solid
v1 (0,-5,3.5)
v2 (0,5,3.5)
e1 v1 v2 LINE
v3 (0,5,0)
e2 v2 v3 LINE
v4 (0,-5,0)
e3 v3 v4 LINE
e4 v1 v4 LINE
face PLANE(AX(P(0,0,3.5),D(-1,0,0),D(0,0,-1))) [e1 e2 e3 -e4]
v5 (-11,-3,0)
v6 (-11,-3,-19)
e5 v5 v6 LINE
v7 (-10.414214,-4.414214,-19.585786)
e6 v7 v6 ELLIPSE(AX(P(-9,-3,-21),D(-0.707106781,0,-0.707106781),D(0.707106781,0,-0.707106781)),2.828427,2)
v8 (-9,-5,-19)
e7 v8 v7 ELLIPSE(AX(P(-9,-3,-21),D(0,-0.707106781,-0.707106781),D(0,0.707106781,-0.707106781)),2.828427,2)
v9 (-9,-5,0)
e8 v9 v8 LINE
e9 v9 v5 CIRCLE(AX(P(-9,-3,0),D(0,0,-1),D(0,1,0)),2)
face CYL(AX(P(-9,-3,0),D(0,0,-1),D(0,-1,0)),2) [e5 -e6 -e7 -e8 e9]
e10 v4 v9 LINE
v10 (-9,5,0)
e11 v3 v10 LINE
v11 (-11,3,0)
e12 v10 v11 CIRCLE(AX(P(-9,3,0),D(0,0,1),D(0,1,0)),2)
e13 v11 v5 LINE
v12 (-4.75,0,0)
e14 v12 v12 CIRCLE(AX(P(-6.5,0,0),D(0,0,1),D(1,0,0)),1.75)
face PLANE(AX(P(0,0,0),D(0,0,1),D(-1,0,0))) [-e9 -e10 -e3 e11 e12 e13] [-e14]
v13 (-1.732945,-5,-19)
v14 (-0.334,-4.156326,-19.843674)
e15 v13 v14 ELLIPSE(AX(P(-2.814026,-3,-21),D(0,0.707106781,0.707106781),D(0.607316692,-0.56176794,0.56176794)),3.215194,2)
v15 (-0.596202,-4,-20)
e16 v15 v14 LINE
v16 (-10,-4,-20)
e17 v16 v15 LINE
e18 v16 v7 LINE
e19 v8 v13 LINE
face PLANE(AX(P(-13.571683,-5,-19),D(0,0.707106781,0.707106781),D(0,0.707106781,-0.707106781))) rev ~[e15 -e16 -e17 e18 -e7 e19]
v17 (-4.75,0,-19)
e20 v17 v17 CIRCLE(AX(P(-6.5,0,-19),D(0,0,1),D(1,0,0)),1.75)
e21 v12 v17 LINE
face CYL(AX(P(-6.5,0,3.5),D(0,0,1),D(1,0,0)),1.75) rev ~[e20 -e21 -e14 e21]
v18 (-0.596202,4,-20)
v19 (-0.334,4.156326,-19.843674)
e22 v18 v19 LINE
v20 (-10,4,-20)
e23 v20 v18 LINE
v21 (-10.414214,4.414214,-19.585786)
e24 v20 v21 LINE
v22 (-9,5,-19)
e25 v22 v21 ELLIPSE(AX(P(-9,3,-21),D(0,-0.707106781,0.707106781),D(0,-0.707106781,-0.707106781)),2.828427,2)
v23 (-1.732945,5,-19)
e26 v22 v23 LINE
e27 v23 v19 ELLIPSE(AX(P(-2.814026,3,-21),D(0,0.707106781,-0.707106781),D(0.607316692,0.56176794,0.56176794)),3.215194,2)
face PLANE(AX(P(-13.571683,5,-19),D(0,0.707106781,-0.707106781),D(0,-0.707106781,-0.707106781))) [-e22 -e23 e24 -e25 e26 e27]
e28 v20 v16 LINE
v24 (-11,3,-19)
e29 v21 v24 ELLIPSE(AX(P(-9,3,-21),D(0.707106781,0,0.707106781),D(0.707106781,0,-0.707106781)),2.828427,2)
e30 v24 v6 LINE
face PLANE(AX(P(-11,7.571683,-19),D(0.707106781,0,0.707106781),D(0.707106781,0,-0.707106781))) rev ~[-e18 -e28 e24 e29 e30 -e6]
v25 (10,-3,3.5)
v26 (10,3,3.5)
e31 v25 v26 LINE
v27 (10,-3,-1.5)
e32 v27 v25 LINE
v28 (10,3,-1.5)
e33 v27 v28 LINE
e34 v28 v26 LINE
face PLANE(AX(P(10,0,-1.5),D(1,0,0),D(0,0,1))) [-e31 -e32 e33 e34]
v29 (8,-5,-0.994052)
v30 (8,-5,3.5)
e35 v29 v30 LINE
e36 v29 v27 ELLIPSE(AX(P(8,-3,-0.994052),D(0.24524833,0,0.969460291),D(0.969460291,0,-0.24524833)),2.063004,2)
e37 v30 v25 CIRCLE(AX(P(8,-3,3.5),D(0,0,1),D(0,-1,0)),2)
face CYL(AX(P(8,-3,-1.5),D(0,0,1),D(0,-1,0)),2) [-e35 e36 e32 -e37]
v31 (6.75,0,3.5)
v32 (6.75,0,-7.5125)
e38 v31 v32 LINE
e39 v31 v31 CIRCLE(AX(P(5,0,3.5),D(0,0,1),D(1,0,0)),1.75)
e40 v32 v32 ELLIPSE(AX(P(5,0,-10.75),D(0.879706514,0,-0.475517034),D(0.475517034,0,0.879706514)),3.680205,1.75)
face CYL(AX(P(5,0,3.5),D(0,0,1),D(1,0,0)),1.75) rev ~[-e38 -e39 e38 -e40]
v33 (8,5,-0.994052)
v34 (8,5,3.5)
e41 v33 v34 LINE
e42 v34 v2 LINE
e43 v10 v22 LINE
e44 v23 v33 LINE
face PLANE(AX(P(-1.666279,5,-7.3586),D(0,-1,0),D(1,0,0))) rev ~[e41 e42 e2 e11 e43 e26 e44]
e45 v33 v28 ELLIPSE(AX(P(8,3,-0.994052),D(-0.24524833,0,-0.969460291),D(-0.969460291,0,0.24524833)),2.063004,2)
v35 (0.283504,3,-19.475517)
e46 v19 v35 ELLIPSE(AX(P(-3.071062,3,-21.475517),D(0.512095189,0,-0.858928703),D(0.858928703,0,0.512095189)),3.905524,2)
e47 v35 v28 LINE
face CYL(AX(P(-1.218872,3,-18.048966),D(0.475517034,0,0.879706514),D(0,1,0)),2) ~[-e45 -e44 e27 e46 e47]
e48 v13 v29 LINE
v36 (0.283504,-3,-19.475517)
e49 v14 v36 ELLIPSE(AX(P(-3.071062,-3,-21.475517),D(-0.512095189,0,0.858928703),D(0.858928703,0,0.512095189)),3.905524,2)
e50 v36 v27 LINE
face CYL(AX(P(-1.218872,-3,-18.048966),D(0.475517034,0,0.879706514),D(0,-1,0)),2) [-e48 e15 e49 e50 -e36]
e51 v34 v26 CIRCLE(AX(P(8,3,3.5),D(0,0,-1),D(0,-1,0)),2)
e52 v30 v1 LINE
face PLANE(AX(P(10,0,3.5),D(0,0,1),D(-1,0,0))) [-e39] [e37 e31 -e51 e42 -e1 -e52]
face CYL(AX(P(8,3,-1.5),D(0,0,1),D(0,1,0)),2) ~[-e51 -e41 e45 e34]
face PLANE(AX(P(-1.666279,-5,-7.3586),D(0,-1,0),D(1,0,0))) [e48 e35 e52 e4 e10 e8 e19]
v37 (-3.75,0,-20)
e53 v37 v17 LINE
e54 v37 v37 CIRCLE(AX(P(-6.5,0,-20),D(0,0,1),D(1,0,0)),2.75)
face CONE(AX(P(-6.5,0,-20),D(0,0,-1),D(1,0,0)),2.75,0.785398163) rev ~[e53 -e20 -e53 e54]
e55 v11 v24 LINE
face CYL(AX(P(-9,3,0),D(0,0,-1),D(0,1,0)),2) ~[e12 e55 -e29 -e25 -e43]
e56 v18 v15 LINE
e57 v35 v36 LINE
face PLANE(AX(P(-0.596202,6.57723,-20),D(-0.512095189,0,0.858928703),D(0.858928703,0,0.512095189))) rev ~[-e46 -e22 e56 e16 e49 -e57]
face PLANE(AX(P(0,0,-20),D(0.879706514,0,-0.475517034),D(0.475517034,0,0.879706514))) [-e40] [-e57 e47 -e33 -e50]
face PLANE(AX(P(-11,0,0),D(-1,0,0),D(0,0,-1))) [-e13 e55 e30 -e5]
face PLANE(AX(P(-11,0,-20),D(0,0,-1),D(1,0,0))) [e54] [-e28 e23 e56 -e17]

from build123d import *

# Parameters (mm, degrees)
F1_DEPTH    = 5
F2_R        = 1.75
F3_DEPTH    = 23.501
F4_T1_DEPTH = 15.1433659759
F4_T3_DEPTH = 16.1433659759
F4_T5_DEPTH = 13.1544598894
F5_R        = 2


# Not quite as in the source:
# - a fillet or chamfer that OpenCascade refuses, or shapes differently, is made with other operations: its cross-section is extruded or revolved along the edge and cut away or added


with BuildPart() as f1:
    # F0 (on Front) → F1 (new body, symmetric)
    with BuildSketch(Plane.XZ):
        Polygon((0, 3.5), (0, 0), (-11, 0), (-11, -20), (0, -20), (10, -1.5), (10, 3.5), align=None)
    extrude(amount=F1_DEPTH, both=True)

    # F2 (on face) → F3 (cut, through all)
    with BuildSketch(Plane.XY.offset(3.5)):
        with Locations((-6.5, 0)):
            Circle(F2_R)
        with Locations((5, 0)):
            Circle(F2_R)
    extrude(amount=-F3_DEPTH, mode=Mode.SUBTRACT)

    # F4: chamfer of 1 on 5 edges, made by hand

    # F4_s2 → F4_t1 (cut)
    with BuildSketch(Plane.XZ.offset(-7.571682988)):
        Polygon((-11, -19), (-10, -20), (-11, -20), align=None)
    extrude(amount=F4_T1_DEPTH, mode=Mode.SUBTRACT)

    # F4_s4 → F4_t3 (cut)
    with BuildSketch(Plane.YZ.offset(-13.571682988)):
        Polygon((5, -19), (4, -20), (5, -20), align=None)
        Polygon((-5, -19), (-4, -20), (-5, -20), align=None)
    extrude(amount=F4_T3_DEPTH, mode=Mode.SUBTRACT)

    # F4_s6 → F4_t5 (cut)
    with BuildSketch(Plane.XZ.offset(-6.5772299447)):
        Polygon((-0.5962022078, -20), (0.2835043057, -19.4755170344), (0, -20), align=None)
    extrude(amount=F4_T5_DEPTH, mode=Mode.SUBTRACT)

    # F4_s7 → F4_t8 (revolve, cut)
    with BuildSketch(Plane.XZ):
        Polygon((-3.75, -20), (-4.75, -19), (-4.75, -20), align=None)
    revolve(axis=Axis((-6.5, 0, -20), (0, 0, 1)), mode=Mode.SUBTRACT)

    # F5
    f5_edges = [f1.edges().sort_by_distance(p)[0] for p in [
        (-11, -5, -9.5),
        (-11, 5, -9.5),
        (5.27027, -5, -10.25),
        (10, -5, 1),
        (10, 5, 1),
        (5.27027, 5, -10.25),
    ]]
    fillet(f5_edges, radius=F5_R)


solid = f1.part
